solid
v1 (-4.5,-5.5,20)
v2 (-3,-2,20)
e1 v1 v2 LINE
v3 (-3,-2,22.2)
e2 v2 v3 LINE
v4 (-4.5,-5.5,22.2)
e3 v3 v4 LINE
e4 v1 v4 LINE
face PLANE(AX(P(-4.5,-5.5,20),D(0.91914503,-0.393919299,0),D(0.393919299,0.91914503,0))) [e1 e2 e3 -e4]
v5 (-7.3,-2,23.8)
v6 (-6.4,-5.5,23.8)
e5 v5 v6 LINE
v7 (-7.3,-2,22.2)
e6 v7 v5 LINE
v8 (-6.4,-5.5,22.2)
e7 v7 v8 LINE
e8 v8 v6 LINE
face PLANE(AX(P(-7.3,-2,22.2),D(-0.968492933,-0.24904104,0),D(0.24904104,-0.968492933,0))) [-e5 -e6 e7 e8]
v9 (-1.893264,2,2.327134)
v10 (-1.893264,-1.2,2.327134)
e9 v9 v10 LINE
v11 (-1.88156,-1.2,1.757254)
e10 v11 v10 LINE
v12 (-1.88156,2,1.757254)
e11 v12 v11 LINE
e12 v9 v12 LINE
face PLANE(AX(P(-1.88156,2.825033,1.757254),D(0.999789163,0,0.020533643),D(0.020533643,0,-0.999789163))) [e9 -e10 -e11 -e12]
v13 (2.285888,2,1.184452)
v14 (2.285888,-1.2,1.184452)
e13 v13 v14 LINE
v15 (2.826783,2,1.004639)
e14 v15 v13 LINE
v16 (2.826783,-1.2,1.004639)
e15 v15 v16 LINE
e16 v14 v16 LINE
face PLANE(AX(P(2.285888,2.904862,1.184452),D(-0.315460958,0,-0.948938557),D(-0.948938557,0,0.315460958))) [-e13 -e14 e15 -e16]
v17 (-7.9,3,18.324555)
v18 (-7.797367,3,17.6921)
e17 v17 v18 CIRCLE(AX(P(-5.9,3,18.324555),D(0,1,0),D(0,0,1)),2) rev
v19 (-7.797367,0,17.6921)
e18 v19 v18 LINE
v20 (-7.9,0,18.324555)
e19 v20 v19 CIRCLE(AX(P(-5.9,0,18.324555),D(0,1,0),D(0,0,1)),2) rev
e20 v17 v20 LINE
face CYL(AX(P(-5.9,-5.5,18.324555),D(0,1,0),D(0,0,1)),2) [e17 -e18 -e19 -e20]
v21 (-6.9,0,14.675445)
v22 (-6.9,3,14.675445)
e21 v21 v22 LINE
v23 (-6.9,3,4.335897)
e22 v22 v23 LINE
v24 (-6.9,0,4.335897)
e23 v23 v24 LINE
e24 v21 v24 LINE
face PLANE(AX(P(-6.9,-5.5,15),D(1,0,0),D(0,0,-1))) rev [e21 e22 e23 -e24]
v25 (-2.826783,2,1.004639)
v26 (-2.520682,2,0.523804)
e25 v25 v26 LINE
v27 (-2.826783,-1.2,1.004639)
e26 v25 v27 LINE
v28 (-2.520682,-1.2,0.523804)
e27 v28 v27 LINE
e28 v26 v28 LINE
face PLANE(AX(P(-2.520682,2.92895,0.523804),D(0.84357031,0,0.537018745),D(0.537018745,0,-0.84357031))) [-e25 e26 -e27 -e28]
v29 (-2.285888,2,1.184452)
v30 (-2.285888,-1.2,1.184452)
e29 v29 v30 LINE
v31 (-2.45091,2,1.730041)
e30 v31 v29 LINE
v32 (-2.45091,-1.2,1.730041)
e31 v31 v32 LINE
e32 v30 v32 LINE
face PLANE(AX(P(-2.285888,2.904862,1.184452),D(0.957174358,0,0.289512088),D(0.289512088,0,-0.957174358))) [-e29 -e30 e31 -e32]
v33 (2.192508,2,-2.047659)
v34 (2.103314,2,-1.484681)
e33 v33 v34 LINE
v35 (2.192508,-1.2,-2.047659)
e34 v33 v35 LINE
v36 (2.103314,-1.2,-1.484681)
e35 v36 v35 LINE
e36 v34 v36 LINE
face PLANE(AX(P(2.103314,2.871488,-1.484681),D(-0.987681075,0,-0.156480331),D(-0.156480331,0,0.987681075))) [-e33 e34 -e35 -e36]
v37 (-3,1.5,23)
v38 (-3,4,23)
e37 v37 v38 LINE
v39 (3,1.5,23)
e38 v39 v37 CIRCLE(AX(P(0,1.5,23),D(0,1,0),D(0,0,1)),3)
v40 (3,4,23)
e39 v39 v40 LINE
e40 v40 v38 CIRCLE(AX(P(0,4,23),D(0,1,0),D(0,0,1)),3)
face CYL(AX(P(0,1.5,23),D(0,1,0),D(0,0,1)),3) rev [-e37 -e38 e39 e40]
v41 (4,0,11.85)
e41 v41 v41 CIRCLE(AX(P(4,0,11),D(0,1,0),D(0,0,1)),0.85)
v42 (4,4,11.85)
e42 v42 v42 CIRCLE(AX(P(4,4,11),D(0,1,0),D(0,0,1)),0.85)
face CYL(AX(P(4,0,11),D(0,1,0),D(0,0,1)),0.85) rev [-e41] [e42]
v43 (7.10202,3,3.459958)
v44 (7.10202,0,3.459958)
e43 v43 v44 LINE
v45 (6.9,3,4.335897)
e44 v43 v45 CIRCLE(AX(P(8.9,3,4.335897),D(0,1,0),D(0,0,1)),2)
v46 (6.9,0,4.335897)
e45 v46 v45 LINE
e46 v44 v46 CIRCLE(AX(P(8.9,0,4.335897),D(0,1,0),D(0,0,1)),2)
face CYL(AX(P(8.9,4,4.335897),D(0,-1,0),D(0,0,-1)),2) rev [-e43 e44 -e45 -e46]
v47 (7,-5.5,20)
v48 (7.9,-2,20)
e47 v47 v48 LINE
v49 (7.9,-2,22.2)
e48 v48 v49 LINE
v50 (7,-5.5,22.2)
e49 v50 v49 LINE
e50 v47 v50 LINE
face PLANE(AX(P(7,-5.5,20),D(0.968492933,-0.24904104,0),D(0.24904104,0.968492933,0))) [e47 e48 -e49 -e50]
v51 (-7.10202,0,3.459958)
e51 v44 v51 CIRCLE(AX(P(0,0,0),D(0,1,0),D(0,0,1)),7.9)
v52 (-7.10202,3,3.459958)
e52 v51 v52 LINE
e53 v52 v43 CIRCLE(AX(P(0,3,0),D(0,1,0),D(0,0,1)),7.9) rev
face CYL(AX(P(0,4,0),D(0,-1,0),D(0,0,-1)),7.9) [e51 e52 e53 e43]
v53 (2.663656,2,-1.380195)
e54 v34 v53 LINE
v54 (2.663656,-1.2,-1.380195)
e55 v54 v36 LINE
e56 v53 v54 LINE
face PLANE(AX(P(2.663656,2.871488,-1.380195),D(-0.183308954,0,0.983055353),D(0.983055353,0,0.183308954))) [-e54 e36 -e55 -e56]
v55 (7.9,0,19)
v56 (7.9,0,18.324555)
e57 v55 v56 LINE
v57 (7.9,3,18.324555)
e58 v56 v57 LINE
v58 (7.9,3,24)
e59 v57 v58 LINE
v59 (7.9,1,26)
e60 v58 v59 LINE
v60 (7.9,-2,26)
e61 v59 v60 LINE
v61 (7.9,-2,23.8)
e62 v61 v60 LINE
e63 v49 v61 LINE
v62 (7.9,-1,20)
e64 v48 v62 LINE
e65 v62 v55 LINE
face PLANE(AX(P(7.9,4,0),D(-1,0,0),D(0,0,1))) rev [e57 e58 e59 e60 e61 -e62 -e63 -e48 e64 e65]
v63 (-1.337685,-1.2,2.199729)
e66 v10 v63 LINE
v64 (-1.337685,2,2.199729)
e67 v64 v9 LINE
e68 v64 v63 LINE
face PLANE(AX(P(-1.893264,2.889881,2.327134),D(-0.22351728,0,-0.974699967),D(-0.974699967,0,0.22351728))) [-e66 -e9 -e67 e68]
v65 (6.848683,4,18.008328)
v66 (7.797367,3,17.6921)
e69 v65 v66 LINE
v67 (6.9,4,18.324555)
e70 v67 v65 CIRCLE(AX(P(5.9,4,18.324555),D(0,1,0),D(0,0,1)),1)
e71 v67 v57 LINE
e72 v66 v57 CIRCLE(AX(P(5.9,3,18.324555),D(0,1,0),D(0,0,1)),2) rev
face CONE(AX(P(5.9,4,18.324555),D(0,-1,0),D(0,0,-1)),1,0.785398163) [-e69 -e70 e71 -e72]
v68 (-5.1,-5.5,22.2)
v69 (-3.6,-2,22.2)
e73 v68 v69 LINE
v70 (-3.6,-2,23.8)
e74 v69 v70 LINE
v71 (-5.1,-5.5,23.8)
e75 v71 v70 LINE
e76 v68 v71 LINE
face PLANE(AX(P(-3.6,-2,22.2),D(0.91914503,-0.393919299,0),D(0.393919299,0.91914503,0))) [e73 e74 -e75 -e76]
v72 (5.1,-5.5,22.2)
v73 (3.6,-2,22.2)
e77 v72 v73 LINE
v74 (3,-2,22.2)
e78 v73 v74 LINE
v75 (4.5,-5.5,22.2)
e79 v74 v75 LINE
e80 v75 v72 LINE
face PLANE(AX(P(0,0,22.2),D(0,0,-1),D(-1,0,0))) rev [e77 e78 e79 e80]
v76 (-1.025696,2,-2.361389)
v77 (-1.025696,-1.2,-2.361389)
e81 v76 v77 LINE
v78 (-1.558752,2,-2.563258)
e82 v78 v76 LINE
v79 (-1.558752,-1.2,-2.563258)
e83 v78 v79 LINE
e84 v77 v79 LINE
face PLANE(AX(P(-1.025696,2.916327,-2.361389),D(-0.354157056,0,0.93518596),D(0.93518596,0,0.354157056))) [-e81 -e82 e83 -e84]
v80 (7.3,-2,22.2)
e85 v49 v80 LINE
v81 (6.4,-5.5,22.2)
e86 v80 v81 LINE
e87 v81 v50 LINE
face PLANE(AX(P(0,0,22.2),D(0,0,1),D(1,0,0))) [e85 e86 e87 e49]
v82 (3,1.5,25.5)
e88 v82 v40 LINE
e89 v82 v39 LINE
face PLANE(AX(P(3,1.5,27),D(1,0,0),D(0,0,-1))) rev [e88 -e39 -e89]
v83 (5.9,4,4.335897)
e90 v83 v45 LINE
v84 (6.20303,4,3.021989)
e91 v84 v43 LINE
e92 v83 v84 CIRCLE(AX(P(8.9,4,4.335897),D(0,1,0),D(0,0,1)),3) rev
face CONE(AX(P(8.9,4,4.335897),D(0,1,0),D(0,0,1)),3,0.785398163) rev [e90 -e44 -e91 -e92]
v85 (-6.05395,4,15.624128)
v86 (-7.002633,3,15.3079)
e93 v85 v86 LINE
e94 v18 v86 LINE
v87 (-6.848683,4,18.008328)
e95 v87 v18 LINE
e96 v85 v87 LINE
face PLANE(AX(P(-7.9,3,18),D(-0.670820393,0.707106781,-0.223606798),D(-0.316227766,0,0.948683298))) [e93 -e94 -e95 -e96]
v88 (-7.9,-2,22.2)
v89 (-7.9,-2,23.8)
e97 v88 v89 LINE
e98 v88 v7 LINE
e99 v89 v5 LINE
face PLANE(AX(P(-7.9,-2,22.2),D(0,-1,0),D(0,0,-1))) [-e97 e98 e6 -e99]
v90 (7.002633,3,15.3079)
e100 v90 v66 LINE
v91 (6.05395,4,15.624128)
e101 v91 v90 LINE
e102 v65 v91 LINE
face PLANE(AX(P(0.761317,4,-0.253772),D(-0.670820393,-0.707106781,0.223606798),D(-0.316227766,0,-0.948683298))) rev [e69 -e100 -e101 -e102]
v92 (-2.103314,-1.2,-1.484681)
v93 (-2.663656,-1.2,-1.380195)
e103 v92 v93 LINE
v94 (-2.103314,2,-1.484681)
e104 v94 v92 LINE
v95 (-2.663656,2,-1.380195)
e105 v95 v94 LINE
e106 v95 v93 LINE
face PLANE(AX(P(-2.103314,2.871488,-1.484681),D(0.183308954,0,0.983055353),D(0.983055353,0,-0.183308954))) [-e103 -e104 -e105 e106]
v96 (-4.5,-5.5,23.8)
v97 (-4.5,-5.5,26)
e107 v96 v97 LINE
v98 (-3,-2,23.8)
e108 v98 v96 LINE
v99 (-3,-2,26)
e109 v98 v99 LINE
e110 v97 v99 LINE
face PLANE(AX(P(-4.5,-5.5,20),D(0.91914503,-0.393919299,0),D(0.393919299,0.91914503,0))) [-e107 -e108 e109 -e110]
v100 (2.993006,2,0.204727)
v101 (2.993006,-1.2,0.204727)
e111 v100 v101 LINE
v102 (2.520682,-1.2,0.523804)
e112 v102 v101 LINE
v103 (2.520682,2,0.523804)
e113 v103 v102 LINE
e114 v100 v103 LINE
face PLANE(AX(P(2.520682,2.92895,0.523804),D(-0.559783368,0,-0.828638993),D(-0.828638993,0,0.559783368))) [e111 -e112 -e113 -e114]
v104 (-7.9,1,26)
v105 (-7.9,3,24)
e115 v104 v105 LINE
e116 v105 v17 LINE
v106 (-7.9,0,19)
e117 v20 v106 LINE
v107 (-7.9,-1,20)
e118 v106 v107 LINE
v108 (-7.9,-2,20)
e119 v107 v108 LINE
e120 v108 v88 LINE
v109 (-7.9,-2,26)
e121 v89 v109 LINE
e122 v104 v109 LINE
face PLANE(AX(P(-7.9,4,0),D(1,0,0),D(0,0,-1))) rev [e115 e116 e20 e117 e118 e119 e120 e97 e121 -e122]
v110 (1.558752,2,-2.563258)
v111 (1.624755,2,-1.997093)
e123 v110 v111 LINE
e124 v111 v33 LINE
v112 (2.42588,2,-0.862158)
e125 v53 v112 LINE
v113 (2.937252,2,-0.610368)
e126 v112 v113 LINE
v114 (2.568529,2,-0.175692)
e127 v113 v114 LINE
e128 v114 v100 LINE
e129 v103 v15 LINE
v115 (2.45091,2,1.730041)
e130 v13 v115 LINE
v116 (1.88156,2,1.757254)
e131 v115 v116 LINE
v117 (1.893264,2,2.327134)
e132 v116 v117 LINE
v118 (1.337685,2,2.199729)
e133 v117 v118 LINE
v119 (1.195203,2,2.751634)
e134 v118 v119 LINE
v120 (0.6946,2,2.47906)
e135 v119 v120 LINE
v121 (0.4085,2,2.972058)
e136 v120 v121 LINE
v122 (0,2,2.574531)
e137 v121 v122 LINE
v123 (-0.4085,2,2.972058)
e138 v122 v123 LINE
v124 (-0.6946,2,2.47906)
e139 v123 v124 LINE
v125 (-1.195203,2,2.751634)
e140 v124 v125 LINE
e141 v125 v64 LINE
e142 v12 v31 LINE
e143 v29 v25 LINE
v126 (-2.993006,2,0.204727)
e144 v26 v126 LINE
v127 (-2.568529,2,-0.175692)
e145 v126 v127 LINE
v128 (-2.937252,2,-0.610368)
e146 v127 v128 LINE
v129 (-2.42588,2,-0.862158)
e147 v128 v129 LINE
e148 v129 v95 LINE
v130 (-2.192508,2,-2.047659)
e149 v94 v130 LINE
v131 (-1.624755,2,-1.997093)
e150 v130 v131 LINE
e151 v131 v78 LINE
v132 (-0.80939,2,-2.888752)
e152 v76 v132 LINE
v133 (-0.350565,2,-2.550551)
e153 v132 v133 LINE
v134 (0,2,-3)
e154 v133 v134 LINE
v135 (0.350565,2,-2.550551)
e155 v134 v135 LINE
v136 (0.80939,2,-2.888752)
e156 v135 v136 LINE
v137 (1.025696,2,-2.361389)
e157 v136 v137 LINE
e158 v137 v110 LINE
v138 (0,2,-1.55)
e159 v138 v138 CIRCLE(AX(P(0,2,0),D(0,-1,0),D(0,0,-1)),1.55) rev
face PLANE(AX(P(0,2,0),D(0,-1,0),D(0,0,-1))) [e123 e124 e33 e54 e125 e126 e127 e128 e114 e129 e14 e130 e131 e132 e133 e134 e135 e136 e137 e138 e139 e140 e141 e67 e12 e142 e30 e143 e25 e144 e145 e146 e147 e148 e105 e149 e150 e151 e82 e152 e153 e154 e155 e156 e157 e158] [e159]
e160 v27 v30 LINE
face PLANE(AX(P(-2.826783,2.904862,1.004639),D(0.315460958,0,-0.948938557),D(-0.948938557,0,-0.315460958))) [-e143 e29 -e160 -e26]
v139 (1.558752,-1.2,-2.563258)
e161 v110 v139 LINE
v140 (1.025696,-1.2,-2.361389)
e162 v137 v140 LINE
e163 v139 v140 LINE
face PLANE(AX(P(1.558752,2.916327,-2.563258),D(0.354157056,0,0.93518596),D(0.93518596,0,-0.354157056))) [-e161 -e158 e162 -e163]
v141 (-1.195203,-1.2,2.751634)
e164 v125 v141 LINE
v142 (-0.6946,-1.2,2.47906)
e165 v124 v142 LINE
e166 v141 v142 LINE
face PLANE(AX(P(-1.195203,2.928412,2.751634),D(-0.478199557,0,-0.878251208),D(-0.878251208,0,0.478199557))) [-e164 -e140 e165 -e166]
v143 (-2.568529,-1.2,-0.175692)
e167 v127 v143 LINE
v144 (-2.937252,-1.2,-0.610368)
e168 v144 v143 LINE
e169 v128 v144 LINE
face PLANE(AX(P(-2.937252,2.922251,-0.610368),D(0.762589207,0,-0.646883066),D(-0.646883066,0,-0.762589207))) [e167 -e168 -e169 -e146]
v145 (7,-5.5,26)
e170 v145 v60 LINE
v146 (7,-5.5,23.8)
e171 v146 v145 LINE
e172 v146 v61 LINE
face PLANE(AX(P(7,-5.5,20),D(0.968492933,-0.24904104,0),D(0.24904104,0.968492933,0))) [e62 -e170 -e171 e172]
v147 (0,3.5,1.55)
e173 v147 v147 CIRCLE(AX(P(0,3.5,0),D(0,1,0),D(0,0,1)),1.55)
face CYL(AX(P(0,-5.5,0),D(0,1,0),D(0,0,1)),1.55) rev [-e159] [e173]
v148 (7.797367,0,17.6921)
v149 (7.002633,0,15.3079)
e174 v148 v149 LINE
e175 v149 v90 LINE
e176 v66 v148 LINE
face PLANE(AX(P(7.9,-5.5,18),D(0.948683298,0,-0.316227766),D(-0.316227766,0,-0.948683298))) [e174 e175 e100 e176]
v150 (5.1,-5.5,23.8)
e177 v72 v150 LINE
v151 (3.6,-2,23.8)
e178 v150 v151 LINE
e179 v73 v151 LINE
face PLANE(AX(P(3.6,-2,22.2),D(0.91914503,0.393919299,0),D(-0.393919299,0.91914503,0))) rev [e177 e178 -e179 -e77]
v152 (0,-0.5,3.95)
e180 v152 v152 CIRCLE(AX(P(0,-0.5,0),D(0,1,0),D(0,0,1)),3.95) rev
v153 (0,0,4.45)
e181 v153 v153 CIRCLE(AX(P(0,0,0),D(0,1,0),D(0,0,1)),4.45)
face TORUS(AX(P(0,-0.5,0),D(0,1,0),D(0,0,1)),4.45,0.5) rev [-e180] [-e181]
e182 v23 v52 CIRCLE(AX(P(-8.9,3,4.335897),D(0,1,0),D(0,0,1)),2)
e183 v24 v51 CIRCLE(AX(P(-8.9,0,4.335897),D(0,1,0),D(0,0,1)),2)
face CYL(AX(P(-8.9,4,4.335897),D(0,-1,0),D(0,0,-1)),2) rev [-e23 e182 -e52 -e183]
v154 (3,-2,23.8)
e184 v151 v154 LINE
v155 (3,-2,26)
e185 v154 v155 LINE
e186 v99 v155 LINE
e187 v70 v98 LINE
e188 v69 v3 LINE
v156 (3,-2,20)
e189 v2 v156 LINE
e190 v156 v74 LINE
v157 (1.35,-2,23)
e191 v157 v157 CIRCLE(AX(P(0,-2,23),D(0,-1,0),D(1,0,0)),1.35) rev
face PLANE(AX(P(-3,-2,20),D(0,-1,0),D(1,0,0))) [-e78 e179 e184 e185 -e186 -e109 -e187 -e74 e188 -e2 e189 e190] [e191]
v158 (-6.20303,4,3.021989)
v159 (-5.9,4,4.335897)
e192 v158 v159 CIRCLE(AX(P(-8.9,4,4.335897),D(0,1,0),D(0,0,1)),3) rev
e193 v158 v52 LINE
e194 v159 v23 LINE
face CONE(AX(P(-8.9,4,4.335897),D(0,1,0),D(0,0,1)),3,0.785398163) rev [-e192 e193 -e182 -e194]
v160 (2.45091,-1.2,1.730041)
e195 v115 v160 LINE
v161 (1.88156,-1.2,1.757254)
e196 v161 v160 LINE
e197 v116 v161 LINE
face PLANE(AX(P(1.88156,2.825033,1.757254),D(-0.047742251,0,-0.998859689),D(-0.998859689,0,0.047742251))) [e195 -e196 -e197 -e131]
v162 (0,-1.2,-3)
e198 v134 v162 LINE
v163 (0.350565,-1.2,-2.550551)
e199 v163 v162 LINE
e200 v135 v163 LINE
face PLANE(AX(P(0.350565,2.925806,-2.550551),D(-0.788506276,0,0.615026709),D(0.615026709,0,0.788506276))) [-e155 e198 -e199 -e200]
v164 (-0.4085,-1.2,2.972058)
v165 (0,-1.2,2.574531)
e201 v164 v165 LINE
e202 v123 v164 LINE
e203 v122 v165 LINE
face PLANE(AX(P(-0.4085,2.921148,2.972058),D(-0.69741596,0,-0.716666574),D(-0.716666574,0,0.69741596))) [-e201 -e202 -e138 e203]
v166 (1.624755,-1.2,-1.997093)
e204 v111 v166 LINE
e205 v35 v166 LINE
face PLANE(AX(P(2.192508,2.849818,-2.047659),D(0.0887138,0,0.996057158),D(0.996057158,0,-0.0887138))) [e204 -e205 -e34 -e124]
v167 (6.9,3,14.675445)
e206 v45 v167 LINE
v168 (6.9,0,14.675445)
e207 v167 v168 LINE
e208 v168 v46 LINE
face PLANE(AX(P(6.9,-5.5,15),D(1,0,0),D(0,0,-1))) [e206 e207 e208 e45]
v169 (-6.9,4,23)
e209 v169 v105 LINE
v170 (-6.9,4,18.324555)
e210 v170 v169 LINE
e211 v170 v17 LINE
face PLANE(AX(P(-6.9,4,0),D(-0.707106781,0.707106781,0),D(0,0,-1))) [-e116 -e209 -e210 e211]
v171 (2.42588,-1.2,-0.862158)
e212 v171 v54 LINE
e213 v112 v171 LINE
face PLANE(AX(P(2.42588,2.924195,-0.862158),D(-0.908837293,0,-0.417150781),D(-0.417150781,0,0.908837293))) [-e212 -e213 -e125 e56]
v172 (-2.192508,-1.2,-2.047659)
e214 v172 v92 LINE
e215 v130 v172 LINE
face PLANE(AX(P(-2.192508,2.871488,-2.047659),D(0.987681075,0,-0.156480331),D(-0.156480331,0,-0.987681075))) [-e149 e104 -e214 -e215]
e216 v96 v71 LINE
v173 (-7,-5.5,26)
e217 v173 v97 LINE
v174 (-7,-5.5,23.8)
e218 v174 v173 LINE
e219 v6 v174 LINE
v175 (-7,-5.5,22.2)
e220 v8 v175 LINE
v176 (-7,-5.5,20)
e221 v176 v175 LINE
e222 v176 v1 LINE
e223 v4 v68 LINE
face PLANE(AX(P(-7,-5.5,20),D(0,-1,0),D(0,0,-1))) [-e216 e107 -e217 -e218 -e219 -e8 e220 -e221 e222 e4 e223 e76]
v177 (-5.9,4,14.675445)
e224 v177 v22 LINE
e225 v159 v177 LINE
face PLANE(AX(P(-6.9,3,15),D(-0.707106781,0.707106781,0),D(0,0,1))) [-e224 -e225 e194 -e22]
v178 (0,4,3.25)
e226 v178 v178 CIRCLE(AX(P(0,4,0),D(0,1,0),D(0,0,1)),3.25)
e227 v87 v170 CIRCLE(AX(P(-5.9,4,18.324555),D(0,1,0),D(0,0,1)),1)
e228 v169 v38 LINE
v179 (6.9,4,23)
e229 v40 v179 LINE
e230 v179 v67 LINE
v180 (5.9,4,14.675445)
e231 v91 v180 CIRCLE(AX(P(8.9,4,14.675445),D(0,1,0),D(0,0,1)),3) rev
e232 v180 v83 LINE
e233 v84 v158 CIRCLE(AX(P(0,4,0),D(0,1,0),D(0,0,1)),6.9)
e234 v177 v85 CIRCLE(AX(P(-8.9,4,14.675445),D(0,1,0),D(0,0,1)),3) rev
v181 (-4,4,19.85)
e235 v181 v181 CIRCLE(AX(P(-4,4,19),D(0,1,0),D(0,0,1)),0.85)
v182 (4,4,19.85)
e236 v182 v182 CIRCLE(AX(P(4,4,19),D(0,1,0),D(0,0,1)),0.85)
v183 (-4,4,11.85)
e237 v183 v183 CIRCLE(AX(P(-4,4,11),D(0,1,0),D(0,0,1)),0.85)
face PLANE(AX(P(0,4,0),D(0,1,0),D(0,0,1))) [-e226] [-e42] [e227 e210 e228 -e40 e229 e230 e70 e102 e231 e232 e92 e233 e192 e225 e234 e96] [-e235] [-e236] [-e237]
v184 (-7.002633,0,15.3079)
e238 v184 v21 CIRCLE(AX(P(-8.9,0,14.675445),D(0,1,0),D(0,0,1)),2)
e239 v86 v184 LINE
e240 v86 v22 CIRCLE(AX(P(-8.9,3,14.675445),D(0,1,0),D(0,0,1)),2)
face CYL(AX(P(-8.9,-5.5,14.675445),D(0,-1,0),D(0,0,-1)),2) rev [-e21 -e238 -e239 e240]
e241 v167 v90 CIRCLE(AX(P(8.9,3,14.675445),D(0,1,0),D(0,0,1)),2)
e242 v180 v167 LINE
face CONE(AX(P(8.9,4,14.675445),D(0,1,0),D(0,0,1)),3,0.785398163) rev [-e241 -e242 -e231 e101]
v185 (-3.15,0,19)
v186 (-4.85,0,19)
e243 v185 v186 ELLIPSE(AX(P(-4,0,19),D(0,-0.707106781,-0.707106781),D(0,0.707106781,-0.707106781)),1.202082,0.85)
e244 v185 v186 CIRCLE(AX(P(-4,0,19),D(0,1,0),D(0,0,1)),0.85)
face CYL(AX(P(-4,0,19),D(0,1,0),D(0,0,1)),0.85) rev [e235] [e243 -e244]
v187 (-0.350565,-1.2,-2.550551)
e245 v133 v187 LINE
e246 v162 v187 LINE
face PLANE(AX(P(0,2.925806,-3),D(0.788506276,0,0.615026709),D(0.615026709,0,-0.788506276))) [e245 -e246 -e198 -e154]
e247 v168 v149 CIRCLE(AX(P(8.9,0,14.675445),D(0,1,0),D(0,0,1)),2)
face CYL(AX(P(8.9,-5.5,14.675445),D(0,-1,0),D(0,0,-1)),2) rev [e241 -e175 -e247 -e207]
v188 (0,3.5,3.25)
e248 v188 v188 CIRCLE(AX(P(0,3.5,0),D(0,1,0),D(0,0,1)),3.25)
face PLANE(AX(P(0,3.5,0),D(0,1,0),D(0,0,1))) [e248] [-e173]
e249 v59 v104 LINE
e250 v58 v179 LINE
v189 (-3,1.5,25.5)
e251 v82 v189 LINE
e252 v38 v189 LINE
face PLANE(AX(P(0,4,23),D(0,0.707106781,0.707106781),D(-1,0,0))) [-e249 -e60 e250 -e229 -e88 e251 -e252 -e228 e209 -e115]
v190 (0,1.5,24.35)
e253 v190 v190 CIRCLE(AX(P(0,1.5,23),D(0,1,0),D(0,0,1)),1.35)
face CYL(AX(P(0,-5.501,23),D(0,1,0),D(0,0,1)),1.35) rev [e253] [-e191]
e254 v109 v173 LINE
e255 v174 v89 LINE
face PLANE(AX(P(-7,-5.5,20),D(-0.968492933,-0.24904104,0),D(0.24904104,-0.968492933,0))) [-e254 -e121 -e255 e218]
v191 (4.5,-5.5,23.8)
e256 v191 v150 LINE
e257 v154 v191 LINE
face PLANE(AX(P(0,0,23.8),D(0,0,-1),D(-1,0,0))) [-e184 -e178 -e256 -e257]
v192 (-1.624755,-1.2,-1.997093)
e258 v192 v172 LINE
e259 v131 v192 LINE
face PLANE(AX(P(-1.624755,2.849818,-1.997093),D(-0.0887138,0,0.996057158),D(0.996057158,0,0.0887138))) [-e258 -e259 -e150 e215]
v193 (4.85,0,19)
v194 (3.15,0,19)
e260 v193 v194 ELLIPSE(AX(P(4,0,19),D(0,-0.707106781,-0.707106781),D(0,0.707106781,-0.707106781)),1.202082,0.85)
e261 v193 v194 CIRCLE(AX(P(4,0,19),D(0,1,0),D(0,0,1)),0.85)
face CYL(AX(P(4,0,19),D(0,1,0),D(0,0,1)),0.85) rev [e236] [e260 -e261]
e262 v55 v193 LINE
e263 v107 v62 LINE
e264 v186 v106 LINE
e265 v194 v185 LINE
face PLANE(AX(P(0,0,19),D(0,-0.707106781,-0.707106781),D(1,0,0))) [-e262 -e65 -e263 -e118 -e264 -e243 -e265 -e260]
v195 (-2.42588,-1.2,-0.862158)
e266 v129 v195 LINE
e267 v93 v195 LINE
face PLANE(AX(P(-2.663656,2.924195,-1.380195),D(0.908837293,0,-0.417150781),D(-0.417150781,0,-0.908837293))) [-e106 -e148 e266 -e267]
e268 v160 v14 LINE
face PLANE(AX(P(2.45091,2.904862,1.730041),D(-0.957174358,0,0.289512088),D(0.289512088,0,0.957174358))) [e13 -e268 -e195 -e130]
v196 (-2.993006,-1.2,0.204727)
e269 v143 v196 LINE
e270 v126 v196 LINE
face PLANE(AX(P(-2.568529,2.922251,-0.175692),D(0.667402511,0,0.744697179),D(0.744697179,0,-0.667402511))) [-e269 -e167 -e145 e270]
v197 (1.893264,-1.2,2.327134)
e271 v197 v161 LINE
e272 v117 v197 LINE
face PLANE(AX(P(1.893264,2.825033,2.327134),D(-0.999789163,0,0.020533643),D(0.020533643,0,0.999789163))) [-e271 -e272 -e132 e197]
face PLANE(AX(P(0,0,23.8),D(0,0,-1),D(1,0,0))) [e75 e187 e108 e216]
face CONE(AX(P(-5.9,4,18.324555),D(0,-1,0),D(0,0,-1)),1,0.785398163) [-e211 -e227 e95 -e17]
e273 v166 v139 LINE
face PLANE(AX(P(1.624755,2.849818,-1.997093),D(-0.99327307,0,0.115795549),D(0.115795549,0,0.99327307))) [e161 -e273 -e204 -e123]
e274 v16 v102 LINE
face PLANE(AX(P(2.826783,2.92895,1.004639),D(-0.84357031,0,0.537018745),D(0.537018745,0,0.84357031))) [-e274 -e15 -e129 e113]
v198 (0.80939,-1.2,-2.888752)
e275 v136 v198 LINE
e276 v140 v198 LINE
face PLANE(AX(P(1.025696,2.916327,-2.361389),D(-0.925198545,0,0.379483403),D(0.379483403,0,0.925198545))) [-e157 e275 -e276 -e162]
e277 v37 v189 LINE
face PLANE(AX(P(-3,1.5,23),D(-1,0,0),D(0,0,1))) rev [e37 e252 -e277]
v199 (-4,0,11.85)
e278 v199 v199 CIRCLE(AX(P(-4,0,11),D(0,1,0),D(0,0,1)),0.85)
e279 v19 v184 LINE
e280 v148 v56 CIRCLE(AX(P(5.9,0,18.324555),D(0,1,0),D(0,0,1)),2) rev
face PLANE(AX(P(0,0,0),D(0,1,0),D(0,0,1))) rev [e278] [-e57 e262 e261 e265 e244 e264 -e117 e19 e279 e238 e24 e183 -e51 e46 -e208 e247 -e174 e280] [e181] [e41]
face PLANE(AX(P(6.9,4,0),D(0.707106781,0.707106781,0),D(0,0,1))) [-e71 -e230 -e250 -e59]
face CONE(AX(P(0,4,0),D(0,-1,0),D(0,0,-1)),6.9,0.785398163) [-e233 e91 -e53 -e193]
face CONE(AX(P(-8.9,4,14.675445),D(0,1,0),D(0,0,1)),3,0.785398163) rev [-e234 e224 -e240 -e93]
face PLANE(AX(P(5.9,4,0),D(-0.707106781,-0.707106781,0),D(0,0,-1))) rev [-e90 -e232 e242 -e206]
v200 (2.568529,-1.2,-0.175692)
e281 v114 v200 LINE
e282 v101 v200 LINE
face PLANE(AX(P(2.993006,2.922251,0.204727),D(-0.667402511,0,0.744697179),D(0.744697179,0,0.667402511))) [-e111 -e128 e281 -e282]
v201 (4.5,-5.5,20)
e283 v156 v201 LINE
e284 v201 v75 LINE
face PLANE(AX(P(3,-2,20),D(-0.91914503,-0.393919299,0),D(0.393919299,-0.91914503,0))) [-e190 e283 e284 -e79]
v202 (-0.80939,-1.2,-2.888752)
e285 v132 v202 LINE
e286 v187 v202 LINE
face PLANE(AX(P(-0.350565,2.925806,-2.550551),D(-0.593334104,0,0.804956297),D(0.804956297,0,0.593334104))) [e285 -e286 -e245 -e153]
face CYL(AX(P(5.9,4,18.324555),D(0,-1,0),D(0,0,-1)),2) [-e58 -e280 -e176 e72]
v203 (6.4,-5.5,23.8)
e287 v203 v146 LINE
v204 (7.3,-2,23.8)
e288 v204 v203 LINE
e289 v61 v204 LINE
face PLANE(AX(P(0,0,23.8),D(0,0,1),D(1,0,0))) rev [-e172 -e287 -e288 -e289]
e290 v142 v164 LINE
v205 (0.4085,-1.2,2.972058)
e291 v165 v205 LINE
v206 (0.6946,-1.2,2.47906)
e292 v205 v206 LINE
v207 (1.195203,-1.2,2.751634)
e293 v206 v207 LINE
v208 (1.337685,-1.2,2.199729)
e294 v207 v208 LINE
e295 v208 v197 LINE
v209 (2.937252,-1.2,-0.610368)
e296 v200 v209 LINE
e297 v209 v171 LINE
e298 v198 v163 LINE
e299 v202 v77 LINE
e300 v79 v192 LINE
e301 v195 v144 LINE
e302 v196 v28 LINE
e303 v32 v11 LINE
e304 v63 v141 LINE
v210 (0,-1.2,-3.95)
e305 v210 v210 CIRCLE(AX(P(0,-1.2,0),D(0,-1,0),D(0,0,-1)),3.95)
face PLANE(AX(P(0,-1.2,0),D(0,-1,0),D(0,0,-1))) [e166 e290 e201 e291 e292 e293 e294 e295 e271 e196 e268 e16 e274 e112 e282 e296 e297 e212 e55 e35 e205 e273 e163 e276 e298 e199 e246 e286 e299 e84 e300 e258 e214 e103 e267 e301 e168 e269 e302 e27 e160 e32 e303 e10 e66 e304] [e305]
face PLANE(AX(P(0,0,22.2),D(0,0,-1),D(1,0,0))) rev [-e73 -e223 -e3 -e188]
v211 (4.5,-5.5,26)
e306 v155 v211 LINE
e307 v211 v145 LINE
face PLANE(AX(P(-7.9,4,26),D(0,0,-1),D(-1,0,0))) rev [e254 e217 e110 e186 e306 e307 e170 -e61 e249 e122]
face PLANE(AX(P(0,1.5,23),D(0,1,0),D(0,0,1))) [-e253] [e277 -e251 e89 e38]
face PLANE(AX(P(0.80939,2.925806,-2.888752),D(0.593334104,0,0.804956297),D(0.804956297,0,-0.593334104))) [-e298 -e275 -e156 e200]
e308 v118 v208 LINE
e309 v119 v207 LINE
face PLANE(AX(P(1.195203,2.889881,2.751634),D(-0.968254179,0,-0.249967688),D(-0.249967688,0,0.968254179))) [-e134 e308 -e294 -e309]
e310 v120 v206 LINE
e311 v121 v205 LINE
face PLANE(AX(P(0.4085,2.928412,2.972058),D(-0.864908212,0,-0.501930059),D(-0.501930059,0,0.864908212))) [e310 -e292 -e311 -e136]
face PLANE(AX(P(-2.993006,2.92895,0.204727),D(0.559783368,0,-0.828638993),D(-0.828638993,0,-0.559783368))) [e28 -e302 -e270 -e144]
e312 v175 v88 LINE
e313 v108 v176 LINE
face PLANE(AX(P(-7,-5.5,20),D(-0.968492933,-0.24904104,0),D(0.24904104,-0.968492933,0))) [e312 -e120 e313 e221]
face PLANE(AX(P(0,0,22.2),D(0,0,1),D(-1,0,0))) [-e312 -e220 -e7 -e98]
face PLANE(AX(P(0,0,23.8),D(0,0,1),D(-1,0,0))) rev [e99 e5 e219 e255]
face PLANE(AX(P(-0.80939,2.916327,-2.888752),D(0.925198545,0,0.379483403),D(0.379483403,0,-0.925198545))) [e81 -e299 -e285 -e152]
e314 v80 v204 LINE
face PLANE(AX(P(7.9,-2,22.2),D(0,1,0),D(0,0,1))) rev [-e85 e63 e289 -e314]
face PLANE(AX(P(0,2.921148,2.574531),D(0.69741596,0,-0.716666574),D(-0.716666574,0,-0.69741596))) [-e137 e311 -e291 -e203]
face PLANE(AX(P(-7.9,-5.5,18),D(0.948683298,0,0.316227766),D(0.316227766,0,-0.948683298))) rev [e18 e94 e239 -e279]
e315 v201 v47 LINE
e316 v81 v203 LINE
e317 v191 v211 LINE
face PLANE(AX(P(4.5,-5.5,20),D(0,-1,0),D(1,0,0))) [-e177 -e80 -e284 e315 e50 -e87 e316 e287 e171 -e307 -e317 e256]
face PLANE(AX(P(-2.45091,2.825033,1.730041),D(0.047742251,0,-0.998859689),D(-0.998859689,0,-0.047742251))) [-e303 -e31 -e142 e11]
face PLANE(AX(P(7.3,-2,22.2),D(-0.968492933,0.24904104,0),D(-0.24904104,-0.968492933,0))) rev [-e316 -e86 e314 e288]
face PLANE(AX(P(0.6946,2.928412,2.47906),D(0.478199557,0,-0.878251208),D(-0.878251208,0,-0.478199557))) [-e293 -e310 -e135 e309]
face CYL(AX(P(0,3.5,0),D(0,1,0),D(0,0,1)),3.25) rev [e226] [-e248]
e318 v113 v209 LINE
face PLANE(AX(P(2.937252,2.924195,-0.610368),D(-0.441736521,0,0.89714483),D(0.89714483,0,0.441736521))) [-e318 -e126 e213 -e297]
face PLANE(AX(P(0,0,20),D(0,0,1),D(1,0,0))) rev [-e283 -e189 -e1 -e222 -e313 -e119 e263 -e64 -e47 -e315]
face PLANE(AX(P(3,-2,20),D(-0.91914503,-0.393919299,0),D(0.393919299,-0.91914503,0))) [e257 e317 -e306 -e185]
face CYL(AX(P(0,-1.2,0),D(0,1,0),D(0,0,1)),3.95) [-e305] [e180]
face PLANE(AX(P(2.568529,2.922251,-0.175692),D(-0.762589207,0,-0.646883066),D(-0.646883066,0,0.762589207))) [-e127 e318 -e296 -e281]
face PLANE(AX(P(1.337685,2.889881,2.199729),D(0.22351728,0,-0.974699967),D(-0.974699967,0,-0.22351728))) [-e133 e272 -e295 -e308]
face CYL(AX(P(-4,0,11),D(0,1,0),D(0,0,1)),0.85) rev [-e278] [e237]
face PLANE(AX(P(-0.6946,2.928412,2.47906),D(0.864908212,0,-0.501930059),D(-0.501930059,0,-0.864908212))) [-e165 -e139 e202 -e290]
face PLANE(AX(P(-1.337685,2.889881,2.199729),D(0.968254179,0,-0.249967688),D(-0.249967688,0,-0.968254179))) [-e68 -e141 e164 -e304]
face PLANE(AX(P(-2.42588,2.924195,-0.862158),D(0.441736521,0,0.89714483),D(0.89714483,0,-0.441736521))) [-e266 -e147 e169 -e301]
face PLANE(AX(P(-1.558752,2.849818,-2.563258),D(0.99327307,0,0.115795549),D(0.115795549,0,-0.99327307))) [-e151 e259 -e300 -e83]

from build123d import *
from build123d.topology import SkipClean

# Parameters (mm, degrees)
EXTRUDE_1_DEPTH          = 4
EXTRUDE_3_DEPTH          = 6
CHAMFER_1_SIZE           = 3
SKETCH_5_R               = 0.85
CUT_EXTRUDE_1_DEPTH      = 4
PATTERN_LINEAR_1_COUNT   = 2
PATTERN_LINEAR_1_PITCH   = 8
CUT_EXTRUDE_2_DEPTH      = 2.5
CUT_EXTRUDE_3_REACH      = 30.061
SKETCH_7_R               = 1.35
SKETCH_8_R               = 3.95
EXTRUDE_4_DEPTH          = 1.2
SKETCH_9_R               = 3.25
CUT_EXTRUDE_4_DEPTH      = 0.5
SKETCH_10_R              = 1.55
CUT_EXTRUDE_5_DEPTH      = 29.786455148
FILLET_1_R               = 0.5
SKETCH_11_R              = 3
CUT_EXTRUDE_6_DEPTH      = 3.2
EXTRUDE_5_DEPTH          = 3.2
PATTERN_CIRCULAR_1_COUNT = 23
CUT_EXTRUDE_7_DEPTH      = 0.8
CUT_EXTRUDE_8_DEPTH      = 29.786455148
FILLET_2_R               = 2
CHAMFER_2_SIZE           = 1


with BuildPart() as part:
    # ｽｹｯﾁ1 → ﾎﾞｽ - 押し出し1 (new body)
    with BuildSketch(Plane(origin=(0, 0, 0), x_dir=(1, 0, 0), z_dir=(0, 1, 0))):
        with BuildLine():
            Line((-7.9, 0), (-7.9, -26))
            Line((-7.9, -26), (7.9, -26))
            Line((7.9, -26), (7.9, 0))
            ThreePointArc((7.9, 0), (0, 7.9), (-7.9, 0))
        make_face()
    extrude(amount=EXTRUDE_1_DEPTH)

    # ｽｹｯﾁ4 → ﾎﾞｽ - 押し出し3 (add)
    with BuildSketch(Plane.XY.offset(26)):
        Polygon((-7, -5.5), (-4.5, -5.5), (-3, -2), (3, -2), (4.5, -5.5), (7, -5.5), (7.9, -2), (7.9, 0), (-7.9, 0), (-7.9, -2), align=None)
    extrude(amount=-EXTRUDE_3_DEPTH)

    # 面取り1
    chamfer_1_edges = [part.edges().sort_by_distance(p)[0] for p in [
        (0, 4, 26),
    ]]
    chamfer(chamfer_1_edges, length=CHAMFER_1_SIZE)

    # ｽｹｯﾁ5 → ｶｯﾄ - 押し出し1 (cut)
    with BuildSketch(Plane(origin=(0, 4, 0), x_dir=(1, 0, 0), z_dir=(0, 1, 0))):
        with Locations(Location((-4, -19, 0), (0, 0, 270))):
            Circle(SKETCH_5_R)
        with Locations(Location((4, -19, 0), (0, 0, 270))):
            Circle(SKETCH_5_R)
    cut_extrude_1 = extrude(amount=-CUT_EXTRUDE_1_DEPTH, mode=Mode.SUBTRACT)

    # 直線ﾊﾟﾀｰﾝ1: ｶｯﾄ - 押し出し1 ×2
    with Locations(*[(0, 0, -i * PATTERN_LINEAR_1_PITCH) for i in range(1, PATTERN_LINEAR_1_COUNT)]):
        add(cut_extrude_1, mode=Mode.SUBTRACT)

    # ｽｹｯﾁ6 → ｶｯﾄ - 押し出し2 (cut)
    with BuildSketch(Plane(origin=(0, 4, 0), x_dir=(1, 0, 0), z_dir=(0, 1, 0))):
        with BuildLine():
            Line((-3, -23), (-3, -27))
            Line((-3, -27), (3, -27))
            Line((3, -27), (3, -23))
            ThreePointArc((3, -23), (0, -20), (-3, -23))
        make_face()
    extrude(amount=-CUT_EXTRUDE_2_DEPTH, mode=Mode.SUBTRACT)

    # ｽｹｯﾁ7 → ｶｯﾄ - 押し出し3 (cut, up to next)
    with BuildSketch(Plane(origin=(0, 1.5, 0), x_dir=(1, 0, 0), z_dir=(0, 1, 0)), mode=Mode.PRIVATE) as cut_extrude_3_sk1:
        with Locations(Location((0, -23, 0), (0, 0, 270))):
            Circle(SKETCH_7_R)
    cut_extrude_3_tool1 = extrude(cut_extrude_3_sk1.sketch, amount=-CUT_EXTRUDE_3_REACH, mode=Mode.PRIVATE) & part.part
    add(cut_extrude_3_tool1.solids().sort_by_distance((0, 1.5, 23))[0], mode=Mode.SUBTRACT)

    # ｽｹｯﾁ8 → ﾎﾞｽ - 押し出し4 (add)
    with BuildSketch(Plane.XZ):
        with Locations(Location((0, 0, 0), (0, 0, 90))):
            Circle(SKETCH_8_R)
    extrude(amount=EXTRUDE_4_DEPTH)

    # ｽｹｯﾁ9 → ｶｯﾄ - 押し出し4 (cut)
    with BuildSketch(Plane(origin=(0, 4, 0), x_dir=(1, 0, 0), z_dir=(0, 1, 0))):
        with Locations(Location((0, 0, 0), (0, 0, 270))):
            Circle(SKETCH_9_R)
    extrude(amount=-CUT_EXTRUDE_4_DEPTH, mode=Mode.SUBTRACT)

    # ｽｹｯﾁ10 → ｶｯﾄ - 押し出し5 (cut, through all)
    with BuildSketch(Plane(origin=(0, 4, 0), x_dir=(1, 0, 0), z_dir=(0, 1, 0))):
        with Locations(Location((0, 0, 0), (0, 0, 270))):
            Circle(SKETCH_10_R)
    extrude(amount=-CUT_EXTRUDE_5_DEPTH, mode=Mode.SUBTRACT)

    # ﾌｨﾚｯﾄ1
    fillet_1_edges = [part.edges().sort_by_distance(p)[0] for p in [
        (0, 0, -3.95),
    ]]
    fillet(fillet_1_edges, radius=FILLET_1_R)

    # ｽｹｯﾁ11 → ｶｯﾄ - 押し出し6 (cut)
    with BuildSketch(Plane.XZ.offset(1.2)):
        with Locations(Location((0, 0, 0), (0, 0, 270))):
            Circle(SKETCH_11_R)
    extrude(amount=-CUT_EXTRUDE_6_DEPTH, mode=Mode.SUBTRACT)

    # ｽｹｯﾁ12 → ﾎﾞｽ - 押し出し5 (add)
    with BuildSketch(Plane.XZ.offset(1.2)):
        with BuildLine():
            Line((-0.408499947, 2.972057838), (0, 2.574530741))
            Line((0, 2.574530741), (0.408499947, 2.972057838))
            ThreePointArc((0.408499947, 2.972057838), (0, 3), (-0.408499947, 2.972057838))
        make_face()
    extrude_5 = extrude(amount=-EXTRUDE_5_DEPTH)

    # 円形ﾊﾟﾀｰﾝ1: ﾎﾞｽ - 押し出し5 ×23 about axis
    pattern_circular_1_axis = Axis((0, 0, 0), (0, 1, 0))
    for i in range(1, PATTERN_CIRCULAR_1_COUNT):
        add(extrude_5.rotate(pattern_circular_1_axis, i * 360 / PATTERN_CIRCULAR_1_COUNT))

    # ｽｹｯﾁ13 → ｶｯﾄ - 押し出し7 (cut, symmetric)
    with BuildSketch(Plane.XY.offset(23)):
        Polygon((3, -2), (4.5, -5.5), (5.1, -5.5), (3.6, -2), align=None)
        Polygon((7.9, -2), (7, -5.5), (6.4, -5.5), (7.3, -2), align=None)
    cut_extrude_7 = extrude(amount=CUT_EXTRUDE_7_DEPTH, both=True, mode=Mode.SUBTRACT)

    # ﾐﾗｰ1: ｶｯﾄ - 押し出し7 across plane
    add(cut_extrude_7.mirror(Plane(origin=(0, 0, 0), x_dir=(0, 0, 1), z_dir=(1, 0, 0))), mode=Mode.SUBTRACT)

    # ｽｹｯﾁ14 → ｶｯﾄ - 押し出し8 (cut, through all)
    with SkipClean():  # the faces are left unmerged after this step: merging them gives an invalid solid
        with BuildSketch(Plane(origin=(0, 4, 0), x_dir=(1, 0, 0), z_dir=(0, 1, 0))):
            with BuildLine():
                Line((-7.9, 0), (-7.9, -18))
                Line((-7.9, -18), (-6.9, -15))
                Line((-6.9, -15), (-6.9, -3.847076812))
                ThreePointArc((-6.9, -3.847076812), (-7.645913941, -1.987460691), (-7.9, 0))
            make_face()
        cut_extrude_8 = extrude(amount=-CUT_EXTRUDE_8_DEPTH, mode=Mode.SUBTRACT)

    # ﾐﾗｰ2: ｶｯﾄ - 押し出し8 across plane
    with SkipClean():  # the faces are left unmerged after this step: merging them gives an invalid solid
        add(cut_extrude_8.mirror(Plane(origin=(0, 0, 0), x_dir=(0, 0, 1), z_dir=(1, 0, 0))), mode=Mode.SUBTRACT)

    # ﾌｨﾚｯﾄ2
    fillet_2_edges = [part.edges().sort_by_distance(p)[0] for p in [
        (-6.9, 2, 3.847076812),
        (-6.9, 2, 15),
        (-7.9, 2, 18),
        (6.9, 2, 3.847076812),
        (7.9, 2, 18),
        (6.9, 2, 15),
    ]]
    fillet(fillet_2_edges, radius=FILLET_2_R)

    # 面取り2
    # the kernel refuses this chamfer: 1 mm, written as the material it adds along each edge
    with BuildSketch(Plane(origin=(7.9, 0, 20), x_dir=(0, 0.02749587661058639, -0.9996219169112968), z_dir=(-1, 0, 0))) as chamfer_2_piece_1_section:
        Polygon((CHAMFER_2_SIZE * 0.999621916911, CHAMFER_2_SIZE * 0.0274958766106), (-CHAMFER_2_SIZE * 0.0274958766106, CHAMFER_2_SIZE * 0.999621916911), (0, 0), align=None)
    chamfer_2_piece_1 = extrude(amount=15.8, mode=Mode.PRIVATE)
    chamfer_2_piece_1 = chamfer_2_piece_1 - Plane(origin=(-4, -0.34097177, 19), x_dir=(0, 0, 1), z_dir=(0, 1, 0)) * Cylinder(0.85, 36, mode=Mode.PRIVATE)
    chamfer_2_piece_1 = chamfer_2_piece_1 - Plane(origin=(4, -0.34097177, 19), x_dir=(0, 0, 1), z_dir=(0, 1, 0)) * Cylinder(0.85, 36, mode=Mode.PRIVATE)
    add(chamfer_2_piece_1)
    # the kernel refuses this chamfer: 1 mm, written as the material it takes off along each edge
    with BuildSketch(Plane(origin=(-7.9, 4, 18.32455532), x_dir=(-0.027495876610586487, -0.9996219169112968, 0), z_dir=(0, 0, 1)), Plane(origin=(7.9, 4, 25.571682988), x_dir=(0.027495876610586487, -0.9996219169112968, 0), z_dir=(0, 0, -1))) as chamfer_2_2_piece_1:
        Polygon((CHAMFER_2_SIZE * 0.999621916911, CHAMFER_2_SIZE * 0.0274958766106), (-CHAMFER_2_SIZE * 0.0274958766106, CHAMFER_2_SIZE * 0.999621916911), (0, 0), align=None)
    extrude(amount=7.247127668, mode=Mode.SUBTRACT)
    with BuildSketch(Plane(origin=(0, 4, 0), x_dir=(1, 0, 0), z_dir=(0, 0, 1))) as chamfer_2_2_piece_2:
        Polygon((7.9, -CHAMFER_2_SIZE), (7.9 - CHAMFER_2_SIZE, 0), (7.9, 0), align=None)
    revolve(axis=Axis((0, 4, 0), (0, 1, 0)), revolution_arc=180, mode=Mode.SUBTRACT)
    with BuildSketch(Plane(origin=(-5.9, 4, 18.32455532), x_dir=(-1, 0, 0), z_dir=(0, 0, 1))) as chamfer_2_2_piece_3:
        Polygon((2, CHAMFER_2_SIZE), (2 - CHAMFER_2_SIZE, 0), (2, 0), align=None)
    revolve(axis=Axis((-5.9, 4, 18.32455532), (0, -1, 0)), revolution_arc=18.434948823, mode=Mode.SUBTRACT)
    with BuildSketch(Plane(origin=(-7.797366596, 4, 17.692099788), x_dir=(-0.026084878905721698, -0.9996219169112968, -0.008694959635240574), z_dir=(0.3162277660168382, 0, -0.9486832980505138))) as chamfer_2_2_piece_4:
        Polygon((CHAMFER_2_SIZE * 0.999621916911, -CHAMFER_2_SIZE * 0.0274958766106), (-CHAMFER_2_SIZE * 0.0274958766106, -CHAMFER_2_SIZE * 0.999621916911), (0, 0), align=None)
    extrude(amount=2.513167019, mode=Mode.SUBTRACT)
    with BuildSketch(Plane(origin=(-8.9, 4, 14.67544468), x_dir=(0.9486832980505138, 0, 0.31622776601683794), z_dir=(-0.31622776601683794, 0, 0.9486832980505138))) as chamfer_2_2_piece_5:
        Polygon((2, -CHAMFER_2_SIZE), (2 + CHAMFER_2_SIZE, 0), (2, 0), align=None)
    revolve(axis=Axis((-8.9, 4, 14.67544468), (0, 1, 0)), revolution_arc=18.434948823, mode=Mode.SUBTRACT)
    with BuildSketch(Plane(origin=(-6.9, 4, 14.67544468), x_dir=(-0.027495876610586487, -0.9996219169112968, 0), z_dir=(0, 0, -1))) as chamfer_2_2_piece_6:
        Polygon((CHAMFER_2_SIZE * 0.999621916911, -CHAMFER_2_SIZE * 0.0274958766106), (-CHAMFER_2_SIZE * 0.0274958766106, -CHAMFER_2_SIZE * 0.999621916911), (0, 0), align=None)
    extrude(amount=10.339548002, mode=Mode.SUBTRACT)
    with BuildSketch(Plane(origin=(-8.9, 4, 4.335896678), x_dir=(1, 0, 0), z_dir=(0, 0, 1))) as chamfer_2_2_piece_7:
        Polygon((2, -CHAMFER_2_SIZE), (2 + CHAMFER_2_SIZE, 0), (2, 0), align=None)
    revolve(axis=Axis((-8.9, 4, 4.335896678), (0, 1, 0)), revolution_arc=25.974390018, mode=Mode.SUBTRACT)
    with BuildSketch(Plane(origin=(8.9, 4, 4.335896678), x_dir=(-0.8989898989898986, 0, -0.43796936138745124), z_dir=(0.43796936138745124, 0, -0.8989898989898986))) as chamfer_2_2_piece_8:
        Polygon((2, -CHAMFER_2_SIZE), (2 + CHAMFER_2_SIZE, 0), (2, 0), align=None)
    revolve(axis=Axis((8.9, 4, 4.335896678), (0, 1, 0)), revolution_arc=25.974390018, mode=Mode.SUBTRACT)
    with BuildSketch(Plane(origin=(6.9, 4, 14.67544468), x_dir=(0.027495876610586487, -0.9996219169112968, 0), z_dir=(0, 0, -1))) as chamfer_2_2_piece_9:
        Polygon((CHAMFER_2_SIZE * 0.999621916911, CHAMFER_2_SIZE * 0.0274958766106), (-CHAMFER_2_SIZE * 0.0274958766106, CHAMFER_2_SIZE * 0.999621916911), (0, 0), align=None)
    extrude(amount=10.339548002, mode=Mode.SUBTRACT)
    with BuildSketch(Plane(origin=(8.9, 4, 14.67544468), x_dir=(-1, 0, 0), z_dir=(0, 0, -1))) as chamfer_2_2_piece_10:
        Polygon((2, -CHAMFER_2_SIZE), (2 + CHAMFER_2_SIZE, 0), (2, 0), align=None)
    revolve(axis=Axis((8.9, 4, 14.67544468), (0, 1, 0)), revolution_arc=18.434948823, mode=Mode.SUBTRACT)
    with BuildSketch(Plane(origin=(7.797366596, 4, 17.692099788), x_dir=(0.02608487890572092, -0.9996219169112968, -0.008694959635240314), z_dir=(-0.3162277660168382, 0, -0.9486832980505138))) as chamfer_2_2_piece_11:
        Polygon((CHAMFER_2_SIZE * 0.999621916911, CHAMFER_2_SIZE * 0.0274958766106), (-CHAMFER_2_SIZE * 0.0274958766106, CHAMFER_2_SIZE * 0.999621916911), (0, 0), align=None)
    extrude(amount=2.513167019, mode=Mode.SUBTRACT)
    with BuildSketch(Plane(origin=(5.9, 4, 18.32455532), x_dir=(0.9486832980505135, 0, -0.3162277660168389), z_dir=(-0.3162277660168389, 0, -0.9486832980505135))) as chamfer_2_2_piece_12:
        Polygon((2, CHAMFER_2_SIZE), (2 - CHAMFER_2_SIZE, 0), (2, 0), align=None)
    revolve(axis=Axis((5.9, 4, 18.32455532), (0, -1, 0)), revolution_arc=18.434948823, mode=Mode.SUBTRACT)
    with BuildSketch(Plane(origin=(0, 4, 0), x_dir=(0.8989898989898988, 0, 0.43796936138745096), z_dir=(-0.43796936138745096, 0, 0.8989898989898988))) as chamfer_2_2_piece_13:
        Polygon((7.9, -CHAMFER_2_SIZE), (7.9 - CHAMFER_2_SIZE, 0), (7.9, 0), align=None)
    revolve(axis=Axis((0, 4, 0), (0, 1, 0)), revolution_arc=25.974390018, mode=Mode.SUBTRACT)
    with BuildSketch(Plane(origin=(0, 4, 0), x_dir=(-0.8989898989898988, 0, 0.43796936138745096), z_dir=(0.43796936138745096, 0, 0.8989898989898988))) as chamfer_2_2_piece_14:
        Polygon((7.9, CHAMFER_2_SIZE), (7.9 - CHAMFER_2_SIZE, 0), (7.9, 0), align=None)
    revolve(axis=Axis((0, 4, 0), (0, -1, 0)), revolution_arc=25.974390018, mode=Mode.SUBTRACT)


solid = part.part
